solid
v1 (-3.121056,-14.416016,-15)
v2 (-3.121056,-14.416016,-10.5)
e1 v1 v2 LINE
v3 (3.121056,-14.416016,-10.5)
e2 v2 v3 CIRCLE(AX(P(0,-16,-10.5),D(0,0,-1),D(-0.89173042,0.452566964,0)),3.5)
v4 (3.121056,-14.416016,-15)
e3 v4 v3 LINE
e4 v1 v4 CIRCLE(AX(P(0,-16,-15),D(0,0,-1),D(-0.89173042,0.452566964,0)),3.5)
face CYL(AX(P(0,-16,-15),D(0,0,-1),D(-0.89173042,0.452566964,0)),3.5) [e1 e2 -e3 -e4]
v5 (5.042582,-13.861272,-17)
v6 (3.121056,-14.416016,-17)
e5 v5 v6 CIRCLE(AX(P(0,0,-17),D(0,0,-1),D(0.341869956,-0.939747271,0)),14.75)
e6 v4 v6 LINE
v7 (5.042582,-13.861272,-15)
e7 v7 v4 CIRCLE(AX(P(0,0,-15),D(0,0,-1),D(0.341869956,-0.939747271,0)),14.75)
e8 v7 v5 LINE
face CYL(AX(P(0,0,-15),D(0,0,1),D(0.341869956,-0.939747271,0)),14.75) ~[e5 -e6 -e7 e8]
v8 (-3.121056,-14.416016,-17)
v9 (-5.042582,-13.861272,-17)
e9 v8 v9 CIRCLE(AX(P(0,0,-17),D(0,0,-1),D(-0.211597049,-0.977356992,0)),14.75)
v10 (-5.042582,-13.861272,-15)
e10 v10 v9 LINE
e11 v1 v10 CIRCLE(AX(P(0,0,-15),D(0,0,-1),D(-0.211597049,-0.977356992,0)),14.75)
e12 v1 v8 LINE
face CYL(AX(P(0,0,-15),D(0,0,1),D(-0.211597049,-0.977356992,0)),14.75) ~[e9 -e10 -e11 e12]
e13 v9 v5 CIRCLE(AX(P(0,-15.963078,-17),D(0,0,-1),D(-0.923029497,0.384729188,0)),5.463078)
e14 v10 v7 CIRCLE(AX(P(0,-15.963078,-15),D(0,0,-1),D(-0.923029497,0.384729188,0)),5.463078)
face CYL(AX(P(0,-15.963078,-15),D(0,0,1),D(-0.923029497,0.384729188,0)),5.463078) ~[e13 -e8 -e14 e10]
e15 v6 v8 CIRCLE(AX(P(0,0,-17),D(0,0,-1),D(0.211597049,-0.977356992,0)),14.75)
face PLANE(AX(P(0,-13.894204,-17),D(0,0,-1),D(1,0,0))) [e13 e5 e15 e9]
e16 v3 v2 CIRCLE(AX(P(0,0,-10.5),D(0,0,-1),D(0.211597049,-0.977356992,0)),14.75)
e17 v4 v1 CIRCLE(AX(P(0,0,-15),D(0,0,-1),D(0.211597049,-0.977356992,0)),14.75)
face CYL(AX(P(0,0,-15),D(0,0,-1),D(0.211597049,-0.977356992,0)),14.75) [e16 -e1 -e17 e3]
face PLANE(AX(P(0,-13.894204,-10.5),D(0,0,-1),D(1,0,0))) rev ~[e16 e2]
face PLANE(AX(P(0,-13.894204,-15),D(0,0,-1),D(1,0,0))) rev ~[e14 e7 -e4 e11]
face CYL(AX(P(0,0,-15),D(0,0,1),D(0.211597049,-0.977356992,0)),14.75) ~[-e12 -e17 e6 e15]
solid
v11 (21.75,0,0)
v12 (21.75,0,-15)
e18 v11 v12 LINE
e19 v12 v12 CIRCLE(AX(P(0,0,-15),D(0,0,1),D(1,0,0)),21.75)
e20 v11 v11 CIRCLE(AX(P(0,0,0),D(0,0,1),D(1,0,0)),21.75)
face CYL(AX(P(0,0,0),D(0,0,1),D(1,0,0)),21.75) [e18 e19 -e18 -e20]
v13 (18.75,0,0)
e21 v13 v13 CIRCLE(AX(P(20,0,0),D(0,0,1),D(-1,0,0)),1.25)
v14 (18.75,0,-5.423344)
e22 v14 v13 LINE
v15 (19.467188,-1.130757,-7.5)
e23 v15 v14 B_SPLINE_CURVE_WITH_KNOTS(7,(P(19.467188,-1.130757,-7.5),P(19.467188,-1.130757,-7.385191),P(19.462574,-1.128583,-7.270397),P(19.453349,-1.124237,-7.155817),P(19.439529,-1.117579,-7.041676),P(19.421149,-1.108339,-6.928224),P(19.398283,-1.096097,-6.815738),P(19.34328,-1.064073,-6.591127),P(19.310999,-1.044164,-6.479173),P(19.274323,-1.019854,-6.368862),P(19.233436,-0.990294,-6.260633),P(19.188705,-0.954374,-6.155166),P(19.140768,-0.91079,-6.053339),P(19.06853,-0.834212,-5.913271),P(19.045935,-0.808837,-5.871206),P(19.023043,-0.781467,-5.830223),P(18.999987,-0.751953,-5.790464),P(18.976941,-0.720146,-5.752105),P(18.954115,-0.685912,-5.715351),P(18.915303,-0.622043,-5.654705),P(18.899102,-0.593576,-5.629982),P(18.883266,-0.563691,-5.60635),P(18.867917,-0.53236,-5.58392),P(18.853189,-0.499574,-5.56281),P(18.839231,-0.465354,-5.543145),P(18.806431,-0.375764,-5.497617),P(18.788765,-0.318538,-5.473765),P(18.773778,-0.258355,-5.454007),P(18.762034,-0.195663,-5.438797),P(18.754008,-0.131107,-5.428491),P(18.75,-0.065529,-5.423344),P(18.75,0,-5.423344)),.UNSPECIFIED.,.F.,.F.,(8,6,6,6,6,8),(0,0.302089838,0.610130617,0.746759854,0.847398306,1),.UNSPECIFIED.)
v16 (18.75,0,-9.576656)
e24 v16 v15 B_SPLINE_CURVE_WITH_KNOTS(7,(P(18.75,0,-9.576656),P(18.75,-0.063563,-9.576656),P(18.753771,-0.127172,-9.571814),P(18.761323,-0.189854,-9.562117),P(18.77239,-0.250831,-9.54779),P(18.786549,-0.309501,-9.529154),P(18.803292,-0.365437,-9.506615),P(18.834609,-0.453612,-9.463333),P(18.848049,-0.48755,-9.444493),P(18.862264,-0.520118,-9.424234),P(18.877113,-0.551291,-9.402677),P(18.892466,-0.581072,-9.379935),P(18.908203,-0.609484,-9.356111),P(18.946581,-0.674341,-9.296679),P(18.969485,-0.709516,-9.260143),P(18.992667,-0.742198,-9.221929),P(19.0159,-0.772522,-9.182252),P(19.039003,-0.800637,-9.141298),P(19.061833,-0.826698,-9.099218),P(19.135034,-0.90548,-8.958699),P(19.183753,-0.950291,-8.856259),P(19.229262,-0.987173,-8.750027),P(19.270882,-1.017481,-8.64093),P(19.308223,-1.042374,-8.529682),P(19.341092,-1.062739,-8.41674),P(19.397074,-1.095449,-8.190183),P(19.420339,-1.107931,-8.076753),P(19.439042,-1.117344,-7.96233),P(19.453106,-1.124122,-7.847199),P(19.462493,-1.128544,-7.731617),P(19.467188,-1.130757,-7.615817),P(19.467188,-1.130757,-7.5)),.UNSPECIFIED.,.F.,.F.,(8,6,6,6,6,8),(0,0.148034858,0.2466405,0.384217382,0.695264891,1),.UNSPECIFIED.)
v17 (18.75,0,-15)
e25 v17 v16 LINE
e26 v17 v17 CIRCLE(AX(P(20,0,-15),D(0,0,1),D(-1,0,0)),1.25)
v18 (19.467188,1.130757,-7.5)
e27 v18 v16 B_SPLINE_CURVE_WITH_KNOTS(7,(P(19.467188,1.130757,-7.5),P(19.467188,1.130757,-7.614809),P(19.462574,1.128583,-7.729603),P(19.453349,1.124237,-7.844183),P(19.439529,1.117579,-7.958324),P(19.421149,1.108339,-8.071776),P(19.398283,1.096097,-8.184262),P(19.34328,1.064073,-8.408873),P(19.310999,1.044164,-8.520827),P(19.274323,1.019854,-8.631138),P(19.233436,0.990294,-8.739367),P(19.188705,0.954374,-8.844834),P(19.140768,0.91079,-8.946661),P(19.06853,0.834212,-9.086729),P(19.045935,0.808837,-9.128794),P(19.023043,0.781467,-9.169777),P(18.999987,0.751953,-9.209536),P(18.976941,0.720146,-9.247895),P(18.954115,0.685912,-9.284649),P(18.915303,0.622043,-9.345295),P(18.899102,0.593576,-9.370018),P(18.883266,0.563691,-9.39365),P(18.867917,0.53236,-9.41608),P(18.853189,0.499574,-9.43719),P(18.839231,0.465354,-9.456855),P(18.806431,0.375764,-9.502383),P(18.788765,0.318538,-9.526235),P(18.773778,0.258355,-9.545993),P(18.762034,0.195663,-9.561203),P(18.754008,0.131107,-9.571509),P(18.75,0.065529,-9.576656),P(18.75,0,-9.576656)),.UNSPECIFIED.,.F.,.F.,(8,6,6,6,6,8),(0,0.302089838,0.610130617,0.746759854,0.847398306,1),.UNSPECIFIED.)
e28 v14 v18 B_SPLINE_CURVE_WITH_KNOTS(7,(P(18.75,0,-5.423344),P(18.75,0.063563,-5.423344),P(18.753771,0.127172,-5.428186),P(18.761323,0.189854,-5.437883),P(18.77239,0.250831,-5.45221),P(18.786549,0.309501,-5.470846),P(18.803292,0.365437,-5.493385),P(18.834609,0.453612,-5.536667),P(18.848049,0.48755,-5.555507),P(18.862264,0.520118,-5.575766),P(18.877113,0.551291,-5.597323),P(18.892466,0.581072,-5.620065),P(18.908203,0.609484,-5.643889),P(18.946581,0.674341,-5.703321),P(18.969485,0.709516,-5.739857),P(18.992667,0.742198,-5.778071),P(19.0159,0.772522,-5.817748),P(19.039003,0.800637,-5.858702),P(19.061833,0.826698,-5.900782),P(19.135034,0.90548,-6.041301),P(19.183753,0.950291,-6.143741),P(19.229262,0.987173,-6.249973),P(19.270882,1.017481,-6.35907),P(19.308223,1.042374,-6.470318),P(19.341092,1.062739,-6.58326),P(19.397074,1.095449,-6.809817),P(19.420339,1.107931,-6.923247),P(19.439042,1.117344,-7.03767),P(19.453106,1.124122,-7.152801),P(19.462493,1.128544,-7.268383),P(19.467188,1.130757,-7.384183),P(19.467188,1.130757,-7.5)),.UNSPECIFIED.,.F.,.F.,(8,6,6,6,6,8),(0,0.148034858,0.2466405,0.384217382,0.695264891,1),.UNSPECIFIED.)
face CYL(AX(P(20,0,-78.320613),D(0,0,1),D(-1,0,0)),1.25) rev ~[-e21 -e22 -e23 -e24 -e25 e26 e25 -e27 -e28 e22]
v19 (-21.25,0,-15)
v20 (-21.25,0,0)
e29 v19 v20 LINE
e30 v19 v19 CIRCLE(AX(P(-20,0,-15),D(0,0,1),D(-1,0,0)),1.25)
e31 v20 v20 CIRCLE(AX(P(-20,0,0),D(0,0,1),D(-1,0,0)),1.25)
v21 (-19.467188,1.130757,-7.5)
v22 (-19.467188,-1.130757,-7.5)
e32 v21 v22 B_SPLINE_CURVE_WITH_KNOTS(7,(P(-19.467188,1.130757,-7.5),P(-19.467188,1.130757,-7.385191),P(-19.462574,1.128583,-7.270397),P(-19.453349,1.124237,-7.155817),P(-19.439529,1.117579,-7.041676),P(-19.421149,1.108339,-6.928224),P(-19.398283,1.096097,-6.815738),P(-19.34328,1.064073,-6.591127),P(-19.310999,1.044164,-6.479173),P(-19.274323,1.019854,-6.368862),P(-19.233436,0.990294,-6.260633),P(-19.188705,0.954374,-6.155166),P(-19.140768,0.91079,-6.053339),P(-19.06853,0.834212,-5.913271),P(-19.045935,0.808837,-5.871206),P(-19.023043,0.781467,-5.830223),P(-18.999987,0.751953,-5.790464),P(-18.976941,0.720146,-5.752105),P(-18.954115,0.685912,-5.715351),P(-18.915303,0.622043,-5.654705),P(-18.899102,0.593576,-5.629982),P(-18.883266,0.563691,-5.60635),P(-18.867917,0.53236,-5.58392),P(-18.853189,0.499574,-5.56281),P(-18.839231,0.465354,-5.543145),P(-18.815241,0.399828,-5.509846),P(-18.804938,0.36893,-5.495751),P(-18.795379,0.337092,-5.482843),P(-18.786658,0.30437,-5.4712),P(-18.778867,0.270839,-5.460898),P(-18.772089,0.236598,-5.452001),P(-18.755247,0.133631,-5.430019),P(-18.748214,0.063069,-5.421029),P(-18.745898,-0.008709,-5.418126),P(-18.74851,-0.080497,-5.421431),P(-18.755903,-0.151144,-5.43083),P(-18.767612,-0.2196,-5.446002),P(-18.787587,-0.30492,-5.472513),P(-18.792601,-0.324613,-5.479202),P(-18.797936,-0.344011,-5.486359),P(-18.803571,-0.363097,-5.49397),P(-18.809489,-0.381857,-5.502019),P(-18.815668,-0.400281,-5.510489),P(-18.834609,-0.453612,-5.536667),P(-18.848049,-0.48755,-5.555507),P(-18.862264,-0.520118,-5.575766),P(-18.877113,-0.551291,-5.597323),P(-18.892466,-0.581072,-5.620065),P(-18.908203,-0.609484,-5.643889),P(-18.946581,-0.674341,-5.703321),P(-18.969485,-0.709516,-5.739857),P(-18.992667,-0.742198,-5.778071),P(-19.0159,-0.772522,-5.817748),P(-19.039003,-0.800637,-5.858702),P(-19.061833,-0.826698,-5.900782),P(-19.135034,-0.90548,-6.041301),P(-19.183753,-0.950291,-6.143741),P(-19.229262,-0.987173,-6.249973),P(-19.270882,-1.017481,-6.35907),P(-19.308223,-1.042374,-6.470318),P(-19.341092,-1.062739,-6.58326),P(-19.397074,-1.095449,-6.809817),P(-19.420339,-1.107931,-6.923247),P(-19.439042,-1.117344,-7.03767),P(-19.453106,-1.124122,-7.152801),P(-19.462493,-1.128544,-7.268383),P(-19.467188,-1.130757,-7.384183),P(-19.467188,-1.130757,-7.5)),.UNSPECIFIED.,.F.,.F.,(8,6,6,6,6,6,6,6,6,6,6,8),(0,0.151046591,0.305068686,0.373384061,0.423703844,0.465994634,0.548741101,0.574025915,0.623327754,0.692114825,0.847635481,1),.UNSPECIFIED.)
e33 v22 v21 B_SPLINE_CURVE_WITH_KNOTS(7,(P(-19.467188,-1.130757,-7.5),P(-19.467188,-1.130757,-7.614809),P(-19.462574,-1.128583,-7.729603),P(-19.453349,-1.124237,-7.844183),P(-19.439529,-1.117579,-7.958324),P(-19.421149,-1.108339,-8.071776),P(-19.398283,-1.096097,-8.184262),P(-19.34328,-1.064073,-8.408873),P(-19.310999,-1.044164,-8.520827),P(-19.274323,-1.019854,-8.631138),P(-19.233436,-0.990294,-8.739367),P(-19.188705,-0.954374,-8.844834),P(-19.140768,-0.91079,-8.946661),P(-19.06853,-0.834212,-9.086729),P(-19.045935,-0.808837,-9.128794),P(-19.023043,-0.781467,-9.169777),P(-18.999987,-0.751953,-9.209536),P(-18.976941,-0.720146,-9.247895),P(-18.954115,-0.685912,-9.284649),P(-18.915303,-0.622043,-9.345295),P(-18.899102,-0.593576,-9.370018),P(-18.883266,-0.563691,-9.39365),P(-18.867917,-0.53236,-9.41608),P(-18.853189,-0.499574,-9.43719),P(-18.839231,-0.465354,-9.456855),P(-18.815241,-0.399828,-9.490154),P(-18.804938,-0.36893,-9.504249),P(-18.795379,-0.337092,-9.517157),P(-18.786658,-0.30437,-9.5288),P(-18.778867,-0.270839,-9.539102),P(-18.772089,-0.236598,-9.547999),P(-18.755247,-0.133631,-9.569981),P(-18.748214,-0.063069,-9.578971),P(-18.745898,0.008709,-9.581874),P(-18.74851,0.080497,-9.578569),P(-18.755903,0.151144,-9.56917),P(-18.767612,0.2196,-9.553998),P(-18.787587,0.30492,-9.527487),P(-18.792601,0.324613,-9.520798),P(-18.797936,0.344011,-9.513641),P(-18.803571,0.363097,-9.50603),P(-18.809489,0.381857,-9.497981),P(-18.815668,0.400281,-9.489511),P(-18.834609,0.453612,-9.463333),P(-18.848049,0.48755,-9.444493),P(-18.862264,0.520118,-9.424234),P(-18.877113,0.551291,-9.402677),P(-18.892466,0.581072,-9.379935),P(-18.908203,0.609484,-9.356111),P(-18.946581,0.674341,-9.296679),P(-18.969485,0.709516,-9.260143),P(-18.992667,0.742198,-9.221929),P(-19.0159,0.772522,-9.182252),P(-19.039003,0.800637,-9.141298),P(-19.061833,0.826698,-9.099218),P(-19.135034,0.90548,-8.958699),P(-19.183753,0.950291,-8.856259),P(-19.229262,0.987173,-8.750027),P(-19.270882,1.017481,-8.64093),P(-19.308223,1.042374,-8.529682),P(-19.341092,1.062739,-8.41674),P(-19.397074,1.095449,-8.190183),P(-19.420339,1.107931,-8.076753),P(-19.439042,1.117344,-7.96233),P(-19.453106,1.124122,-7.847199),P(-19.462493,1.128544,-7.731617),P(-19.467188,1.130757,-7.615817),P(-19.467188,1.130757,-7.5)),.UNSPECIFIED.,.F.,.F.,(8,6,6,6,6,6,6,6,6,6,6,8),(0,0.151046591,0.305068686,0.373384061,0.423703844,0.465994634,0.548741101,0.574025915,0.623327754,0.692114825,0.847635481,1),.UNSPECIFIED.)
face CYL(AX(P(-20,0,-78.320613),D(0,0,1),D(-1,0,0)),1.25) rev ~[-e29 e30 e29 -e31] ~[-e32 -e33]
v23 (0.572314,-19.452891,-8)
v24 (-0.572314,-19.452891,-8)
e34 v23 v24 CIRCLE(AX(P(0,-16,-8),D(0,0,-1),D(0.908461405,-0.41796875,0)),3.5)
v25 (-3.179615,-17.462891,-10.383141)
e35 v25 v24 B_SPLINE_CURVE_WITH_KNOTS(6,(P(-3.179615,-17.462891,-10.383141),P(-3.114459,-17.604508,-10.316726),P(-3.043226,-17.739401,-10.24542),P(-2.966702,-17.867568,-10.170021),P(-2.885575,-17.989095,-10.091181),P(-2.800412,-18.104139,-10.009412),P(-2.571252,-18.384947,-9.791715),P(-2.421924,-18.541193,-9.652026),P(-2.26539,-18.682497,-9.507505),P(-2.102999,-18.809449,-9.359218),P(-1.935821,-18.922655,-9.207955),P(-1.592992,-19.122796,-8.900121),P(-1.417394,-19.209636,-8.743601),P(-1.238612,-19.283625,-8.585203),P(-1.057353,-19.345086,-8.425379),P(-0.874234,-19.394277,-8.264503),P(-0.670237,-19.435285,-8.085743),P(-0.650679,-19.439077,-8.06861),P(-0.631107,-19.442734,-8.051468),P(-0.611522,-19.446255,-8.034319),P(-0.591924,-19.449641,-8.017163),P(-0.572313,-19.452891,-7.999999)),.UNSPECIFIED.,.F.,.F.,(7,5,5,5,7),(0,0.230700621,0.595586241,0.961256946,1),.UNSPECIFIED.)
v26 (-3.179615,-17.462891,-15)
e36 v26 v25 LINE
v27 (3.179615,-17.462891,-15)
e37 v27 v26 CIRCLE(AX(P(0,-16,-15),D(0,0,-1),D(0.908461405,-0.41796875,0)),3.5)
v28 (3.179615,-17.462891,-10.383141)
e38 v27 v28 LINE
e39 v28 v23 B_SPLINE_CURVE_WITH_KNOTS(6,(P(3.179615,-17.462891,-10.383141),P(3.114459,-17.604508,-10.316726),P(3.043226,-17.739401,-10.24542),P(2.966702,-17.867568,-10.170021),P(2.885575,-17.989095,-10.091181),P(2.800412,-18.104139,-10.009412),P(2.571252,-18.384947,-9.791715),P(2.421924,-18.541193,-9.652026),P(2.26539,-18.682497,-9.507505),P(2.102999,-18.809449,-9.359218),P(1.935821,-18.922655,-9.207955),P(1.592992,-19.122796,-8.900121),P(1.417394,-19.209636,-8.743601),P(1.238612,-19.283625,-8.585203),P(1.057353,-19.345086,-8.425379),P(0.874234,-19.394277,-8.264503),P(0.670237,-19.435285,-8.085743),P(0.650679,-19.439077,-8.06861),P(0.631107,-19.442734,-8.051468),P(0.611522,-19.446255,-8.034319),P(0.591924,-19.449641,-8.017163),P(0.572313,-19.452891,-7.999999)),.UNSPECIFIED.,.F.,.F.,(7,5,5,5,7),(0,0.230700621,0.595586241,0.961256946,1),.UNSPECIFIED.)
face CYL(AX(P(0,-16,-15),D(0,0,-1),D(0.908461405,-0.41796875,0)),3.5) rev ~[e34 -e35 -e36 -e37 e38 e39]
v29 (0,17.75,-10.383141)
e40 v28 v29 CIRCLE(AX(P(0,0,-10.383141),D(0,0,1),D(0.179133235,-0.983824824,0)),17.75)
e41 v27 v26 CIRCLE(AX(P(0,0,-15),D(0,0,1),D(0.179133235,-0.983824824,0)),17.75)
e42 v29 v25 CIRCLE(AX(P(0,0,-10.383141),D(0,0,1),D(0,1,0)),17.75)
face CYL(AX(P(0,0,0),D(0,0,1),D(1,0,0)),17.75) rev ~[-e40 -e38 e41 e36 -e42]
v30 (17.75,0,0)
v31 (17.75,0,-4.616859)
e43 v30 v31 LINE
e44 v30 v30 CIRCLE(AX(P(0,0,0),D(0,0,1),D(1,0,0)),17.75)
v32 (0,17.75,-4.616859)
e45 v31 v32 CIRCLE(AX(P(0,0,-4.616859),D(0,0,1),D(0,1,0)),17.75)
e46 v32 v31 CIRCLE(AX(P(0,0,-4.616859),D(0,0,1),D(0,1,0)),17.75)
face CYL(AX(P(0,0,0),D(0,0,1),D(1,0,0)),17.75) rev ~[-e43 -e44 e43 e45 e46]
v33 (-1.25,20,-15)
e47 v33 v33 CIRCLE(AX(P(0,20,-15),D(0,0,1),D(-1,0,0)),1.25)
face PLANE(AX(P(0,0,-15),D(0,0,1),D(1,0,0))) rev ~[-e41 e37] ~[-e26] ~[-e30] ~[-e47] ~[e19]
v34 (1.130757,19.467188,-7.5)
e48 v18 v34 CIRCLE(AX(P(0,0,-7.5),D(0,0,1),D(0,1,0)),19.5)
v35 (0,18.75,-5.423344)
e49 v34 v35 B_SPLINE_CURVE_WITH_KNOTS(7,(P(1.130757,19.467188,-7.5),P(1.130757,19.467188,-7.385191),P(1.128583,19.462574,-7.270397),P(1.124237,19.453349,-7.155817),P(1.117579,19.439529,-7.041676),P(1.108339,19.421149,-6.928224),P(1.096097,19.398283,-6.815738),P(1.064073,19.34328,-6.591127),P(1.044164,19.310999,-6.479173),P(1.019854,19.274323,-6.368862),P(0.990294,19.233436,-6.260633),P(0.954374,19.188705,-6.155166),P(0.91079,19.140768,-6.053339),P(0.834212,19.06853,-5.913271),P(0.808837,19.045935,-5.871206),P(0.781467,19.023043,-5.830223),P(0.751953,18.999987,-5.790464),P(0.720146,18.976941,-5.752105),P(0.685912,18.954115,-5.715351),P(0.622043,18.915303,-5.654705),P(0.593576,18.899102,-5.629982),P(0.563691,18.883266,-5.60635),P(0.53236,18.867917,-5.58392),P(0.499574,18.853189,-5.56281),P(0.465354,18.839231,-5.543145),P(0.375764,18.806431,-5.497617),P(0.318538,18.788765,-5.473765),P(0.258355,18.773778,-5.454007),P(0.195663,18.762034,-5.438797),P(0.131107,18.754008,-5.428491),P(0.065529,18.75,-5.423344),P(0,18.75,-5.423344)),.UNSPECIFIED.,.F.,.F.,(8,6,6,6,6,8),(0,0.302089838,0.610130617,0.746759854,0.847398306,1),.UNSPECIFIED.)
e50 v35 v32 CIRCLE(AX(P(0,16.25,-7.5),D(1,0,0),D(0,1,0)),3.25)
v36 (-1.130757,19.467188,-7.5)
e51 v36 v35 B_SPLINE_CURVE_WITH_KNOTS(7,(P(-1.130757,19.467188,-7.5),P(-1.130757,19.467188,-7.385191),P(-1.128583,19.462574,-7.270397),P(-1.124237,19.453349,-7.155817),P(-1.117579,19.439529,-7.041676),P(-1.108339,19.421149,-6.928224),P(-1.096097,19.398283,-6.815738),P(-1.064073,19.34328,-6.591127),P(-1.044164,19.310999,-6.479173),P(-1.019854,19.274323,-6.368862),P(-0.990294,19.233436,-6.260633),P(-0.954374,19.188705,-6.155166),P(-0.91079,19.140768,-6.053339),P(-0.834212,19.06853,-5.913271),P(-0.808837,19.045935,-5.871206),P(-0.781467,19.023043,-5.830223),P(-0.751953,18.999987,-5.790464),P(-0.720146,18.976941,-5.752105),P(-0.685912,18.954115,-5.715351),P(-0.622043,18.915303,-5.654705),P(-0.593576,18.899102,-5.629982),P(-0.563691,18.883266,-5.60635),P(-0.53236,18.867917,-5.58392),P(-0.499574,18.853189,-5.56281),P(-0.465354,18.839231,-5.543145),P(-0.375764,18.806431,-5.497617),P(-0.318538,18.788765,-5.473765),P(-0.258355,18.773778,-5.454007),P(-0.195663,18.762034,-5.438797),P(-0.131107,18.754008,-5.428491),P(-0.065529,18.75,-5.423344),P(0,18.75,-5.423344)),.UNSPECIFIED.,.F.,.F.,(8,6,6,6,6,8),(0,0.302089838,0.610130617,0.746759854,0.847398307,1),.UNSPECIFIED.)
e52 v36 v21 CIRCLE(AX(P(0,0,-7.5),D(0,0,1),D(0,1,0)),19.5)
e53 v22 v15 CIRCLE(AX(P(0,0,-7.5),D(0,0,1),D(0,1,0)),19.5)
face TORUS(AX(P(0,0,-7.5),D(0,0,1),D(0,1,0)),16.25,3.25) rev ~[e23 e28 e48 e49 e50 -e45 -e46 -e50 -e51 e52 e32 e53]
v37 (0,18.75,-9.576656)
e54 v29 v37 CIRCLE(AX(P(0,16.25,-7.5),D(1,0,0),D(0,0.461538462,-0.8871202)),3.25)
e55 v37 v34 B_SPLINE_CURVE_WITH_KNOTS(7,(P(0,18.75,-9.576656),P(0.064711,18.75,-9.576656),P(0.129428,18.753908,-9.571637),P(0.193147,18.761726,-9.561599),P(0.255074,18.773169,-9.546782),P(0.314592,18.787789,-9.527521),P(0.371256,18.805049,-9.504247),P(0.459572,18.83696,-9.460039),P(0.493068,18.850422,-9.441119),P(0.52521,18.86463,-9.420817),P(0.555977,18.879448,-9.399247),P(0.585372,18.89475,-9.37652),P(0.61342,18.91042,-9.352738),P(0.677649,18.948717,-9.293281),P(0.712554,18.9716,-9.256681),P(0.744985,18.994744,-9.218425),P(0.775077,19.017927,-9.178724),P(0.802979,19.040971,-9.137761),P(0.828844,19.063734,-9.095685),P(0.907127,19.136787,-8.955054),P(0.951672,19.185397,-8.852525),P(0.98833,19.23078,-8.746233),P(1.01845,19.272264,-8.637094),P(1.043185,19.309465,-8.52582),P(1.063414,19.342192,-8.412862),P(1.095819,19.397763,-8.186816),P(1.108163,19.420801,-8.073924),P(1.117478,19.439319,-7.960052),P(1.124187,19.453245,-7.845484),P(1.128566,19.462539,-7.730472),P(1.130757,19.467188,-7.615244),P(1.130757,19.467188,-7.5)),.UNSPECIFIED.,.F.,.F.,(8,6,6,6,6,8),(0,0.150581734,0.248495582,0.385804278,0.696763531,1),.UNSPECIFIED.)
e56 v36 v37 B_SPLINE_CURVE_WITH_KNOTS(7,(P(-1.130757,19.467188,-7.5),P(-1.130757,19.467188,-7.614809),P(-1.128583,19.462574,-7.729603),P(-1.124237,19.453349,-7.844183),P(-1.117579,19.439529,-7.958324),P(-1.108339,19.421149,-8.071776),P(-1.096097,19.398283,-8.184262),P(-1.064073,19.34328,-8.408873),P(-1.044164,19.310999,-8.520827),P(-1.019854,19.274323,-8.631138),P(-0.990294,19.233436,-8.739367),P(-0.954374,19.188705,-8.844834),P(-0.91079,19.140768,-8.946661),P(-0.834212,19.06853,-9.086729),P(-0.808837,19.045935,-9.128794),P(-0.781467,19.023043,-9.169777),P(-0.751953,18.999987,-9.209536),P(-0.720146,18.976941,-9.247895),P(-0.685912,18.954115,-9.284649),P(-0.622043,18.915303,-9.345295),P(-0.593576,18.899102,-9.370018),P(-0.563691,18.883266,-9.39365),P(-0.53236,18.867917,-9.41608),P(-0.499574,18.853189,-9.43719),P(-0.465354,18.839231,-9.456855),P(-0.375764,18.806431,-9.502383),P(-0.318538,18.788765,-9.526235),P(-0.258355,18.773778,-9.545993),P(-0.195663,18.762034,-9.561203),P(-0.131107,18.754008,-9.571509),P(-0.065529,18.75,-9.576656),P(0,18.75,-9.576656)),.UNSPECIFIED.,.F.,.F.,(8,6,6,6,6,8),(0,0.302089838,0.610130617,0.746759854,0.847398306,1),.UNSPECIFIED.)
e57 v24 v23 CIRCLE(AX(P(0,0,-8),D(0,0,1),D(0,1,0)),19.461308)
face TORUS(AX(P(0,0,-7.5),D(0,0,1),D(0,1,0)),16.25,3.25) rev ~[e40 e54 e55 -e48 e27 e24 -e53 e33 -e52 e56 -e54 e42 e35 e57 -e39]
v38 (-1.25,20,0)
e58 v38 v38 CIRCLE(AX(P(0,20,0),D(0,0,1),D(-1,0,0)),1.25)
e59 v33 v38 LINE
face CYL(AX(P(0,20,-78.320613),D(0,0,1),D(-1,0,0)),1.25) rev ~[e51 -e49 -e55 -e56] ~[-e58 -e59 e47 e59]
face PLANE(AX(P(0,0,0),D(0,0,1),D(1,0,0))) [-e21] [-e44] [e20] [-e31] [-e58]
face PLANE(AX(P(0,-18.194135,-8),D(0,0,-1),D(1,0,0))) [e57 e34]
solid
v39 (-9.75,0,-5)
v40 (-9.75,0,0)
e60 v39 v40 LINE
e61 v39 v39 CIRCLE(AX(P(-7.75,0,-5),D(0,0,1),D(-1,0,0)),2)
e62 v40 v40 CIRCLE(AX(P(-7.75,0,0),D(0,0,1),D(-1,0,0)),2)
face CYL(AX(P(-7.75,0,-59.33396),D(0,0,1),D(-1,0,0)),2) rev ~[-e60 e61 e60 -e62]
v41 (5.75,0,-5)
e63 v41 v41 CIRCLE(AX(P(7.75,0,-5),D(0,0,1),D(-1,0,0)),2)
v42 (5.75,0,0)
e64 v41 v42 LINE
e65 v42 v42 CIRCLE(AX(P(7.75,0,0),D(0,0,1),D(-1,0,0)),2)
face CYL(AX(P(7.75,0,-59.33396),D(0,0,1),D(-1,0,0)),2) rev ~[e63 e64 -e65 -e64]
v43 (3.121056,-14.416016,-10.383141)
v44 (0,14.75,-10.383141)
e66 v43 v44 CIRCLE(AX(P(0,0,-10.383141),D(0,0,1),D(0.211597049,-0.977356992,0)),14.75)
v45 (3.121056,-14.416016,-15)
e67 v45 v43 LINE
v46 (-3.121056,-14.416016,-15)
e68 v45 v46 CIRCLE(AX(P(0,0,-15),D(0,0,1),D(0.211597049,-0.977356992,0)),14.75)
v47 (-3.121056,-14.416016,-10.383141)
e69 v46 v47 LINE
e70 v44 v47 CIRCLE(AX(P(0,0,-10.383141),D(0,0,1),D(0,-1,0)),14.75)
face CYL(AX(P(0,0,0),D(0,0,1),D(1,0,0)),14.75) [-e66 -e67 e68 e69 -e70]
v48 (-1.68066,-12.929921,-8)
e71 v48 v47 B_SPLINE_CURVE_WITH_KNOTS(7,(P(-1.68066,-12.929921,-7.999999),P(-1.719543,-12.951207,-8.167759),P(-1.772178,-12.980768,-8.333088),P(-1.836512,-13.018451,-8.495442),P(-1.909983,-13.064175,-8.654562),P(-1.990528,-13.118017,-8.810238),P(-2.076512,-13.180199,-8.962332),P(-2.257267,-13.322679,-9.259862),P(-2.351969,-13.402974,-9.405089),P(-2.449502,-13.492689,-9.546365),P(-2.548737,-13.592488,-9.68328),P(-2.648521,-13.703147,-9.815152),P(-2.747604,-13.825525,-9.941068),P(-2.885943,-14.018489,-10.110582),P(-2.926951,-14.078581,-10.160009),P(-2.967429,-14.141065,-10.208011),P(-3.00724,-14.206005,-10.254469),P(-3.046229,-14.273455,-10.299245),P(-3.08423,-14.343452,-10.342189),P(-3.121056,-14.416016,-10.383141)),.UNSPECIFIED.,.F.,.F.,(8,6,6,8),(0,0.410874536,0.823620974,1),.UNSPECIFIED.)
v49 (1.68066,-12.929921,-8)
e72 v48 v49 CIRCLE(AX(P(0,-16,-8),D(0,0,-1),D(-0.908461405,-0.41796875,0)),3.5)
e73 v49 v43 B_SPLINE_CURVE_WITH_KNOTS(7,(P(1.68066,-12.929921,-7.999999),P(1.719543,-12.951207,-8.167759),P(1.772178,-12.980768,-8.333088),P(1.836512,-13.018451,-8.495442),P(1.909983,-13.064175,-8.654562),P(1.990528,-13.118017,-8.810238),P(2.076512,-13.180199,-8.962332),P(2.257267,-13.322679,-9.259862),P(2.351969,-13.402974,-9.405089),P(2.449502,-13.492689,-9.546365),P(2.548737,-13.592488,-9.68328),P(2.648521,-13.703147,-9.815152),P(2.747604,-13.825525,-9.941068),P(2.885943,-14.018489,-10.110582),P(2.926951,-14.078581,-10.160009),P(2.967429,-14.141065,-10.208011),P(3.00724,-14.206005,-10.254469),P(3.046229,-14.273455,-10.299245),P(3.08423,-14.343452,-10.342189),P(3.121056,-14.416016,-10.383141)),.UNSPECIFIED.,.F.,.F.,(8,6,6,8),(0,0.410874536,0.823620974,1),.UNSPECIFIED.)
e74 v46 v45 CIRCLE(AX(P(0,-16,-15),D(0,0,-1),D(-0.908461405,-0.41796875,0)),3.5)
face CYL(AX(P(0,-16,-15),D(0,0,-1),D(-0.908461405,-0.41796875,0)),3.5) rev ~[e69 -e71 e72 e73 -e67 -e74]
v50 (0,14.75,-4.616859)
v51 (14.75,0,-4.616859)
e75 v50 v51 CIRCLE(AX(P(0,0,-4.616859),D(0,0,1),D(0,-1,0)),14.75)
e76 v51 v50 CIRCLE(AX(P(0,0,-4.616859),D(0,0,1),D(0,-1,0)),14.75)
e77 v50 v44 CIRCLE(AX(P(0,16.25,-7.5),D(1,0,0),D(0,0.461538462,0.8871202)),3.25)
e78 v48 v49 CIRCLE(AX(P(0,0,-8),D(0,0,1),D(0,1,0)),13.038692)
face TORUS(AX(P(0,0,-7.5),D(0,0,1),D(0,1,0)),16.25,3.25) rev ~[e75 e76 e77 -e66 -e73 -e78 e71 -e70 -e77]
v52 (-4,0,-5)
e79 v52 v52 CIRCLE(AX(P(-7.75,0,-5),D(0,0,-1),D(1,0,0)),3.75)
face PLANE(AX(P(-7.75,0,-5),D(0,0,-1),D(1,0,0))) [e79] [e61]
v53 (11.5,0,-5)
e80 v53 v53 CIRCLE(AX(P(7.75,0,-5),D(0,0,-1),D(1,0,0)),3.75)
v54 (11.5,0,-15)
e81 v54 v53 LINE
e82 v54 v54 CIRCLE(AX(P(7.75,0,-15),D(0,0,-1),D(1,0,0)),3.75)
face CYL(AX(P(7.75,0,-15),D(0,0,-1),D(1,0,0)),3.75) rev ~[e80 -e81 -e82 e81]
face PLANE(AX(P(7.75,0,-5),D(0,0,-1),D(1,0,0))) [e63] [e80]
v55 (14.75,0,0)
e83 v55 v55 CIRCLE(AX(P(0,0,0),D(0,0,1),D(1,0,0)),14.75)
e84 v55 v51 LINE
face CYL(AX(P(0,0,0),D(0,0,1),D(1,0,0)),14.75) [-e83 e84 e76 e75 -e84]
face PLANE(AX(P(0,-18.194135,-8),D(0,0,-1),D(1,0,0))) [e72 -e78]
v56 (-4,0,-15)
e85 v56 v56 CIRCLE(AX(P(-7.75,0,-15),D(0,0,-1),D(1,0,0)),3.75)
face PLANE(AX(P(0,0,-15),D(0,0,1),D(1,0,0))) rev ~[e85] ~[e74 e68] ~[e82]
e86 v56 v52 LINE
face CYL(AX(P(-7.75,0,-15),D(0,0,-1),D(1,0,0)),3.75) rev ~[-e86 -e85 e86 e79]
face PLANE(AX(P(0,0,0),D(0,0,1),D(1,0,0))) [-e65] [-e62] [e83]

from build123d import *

# Parameters (mm, degrees)
F0_R      = 21.75
F0_R_2    = 17.75
F1_DEPTH  = 15
F0_R_3    = 14.75
F0_R_4    = 4
F9_DEPTH  = 7
F11_D     = 4
F10_R     = 3.75
F12_DEPTH = 10
F14_D     = 2.5
F16_DEPTH = 2
F17_DEPTH = 4.5


with BuildPart() as f1:
    # F0 (on Top) → F1 (new body)
    with BuildSketch(Plane.XY):
        Circle(F0_R)
        Circle(F0_R_2, mode=Mode.SUBTRACT)
    extrude(amount=-F1_DEPTH)


with BuildPart() as f1b:
    # F0 (on Top) → F1, piece 2 (new body)
    with BuildSketch(Plane.XY):
        Circle(F0_R_3)
        Circle(F0_R_4, mode=Mode.SUBTRACT)
        Circle(F0_R_4)
    extrude(amount=-F1_DEPTH)


with BuildPart() as f6_tool:
    # F4 (on Right) → F6 (revolve)
    with BuildSketch(Plane.YZ):
        with BuildLine():
            Line((17.75, -10.3831406487), (17.75, -4.6168593513))
            ThreePointArc((17.75, -4.6168593513), (13, -7.5), (17.75, -10.3831406487))
        make_face()
        with BuildLine():
            ThreePointArc((17.75, -10.3831406487), (19.0282638464, -9.1863421954), (19.5, -7.5))
            ThreePointArc((19.5, -7.5), (19.0282638464, -5.8136578046), (17.75, -4.6168593513))
            Line((17.75, -4.6168593513), (17.75, -10.3831406487))
        make_face()
    revolve(axis=Axis((0, 0, 0), (0, 0, 1)))


with BuildPart() as f1_1:
    add(f1.part)

    # F6: cut by f6_tool
    add(f6_tool.part, mode=Mode.SUBTRACT)


with BuildPart() as f1b_1:
    add(f1b.part)

    # F6: cut by f6_tool
    add(f6_tool.part, mode=Mode.SUBTRACT)


with BuildPart() as f9_tool:
    # F8 (on face) → F9 (new body)
    with BuildSketch(Plane(origin=(0, 0, -15), x_dir=(1, 0, 0), z_dir=(0, 0, -1))):
        with BuildLine():
            ThreePointArc((-3.1796149168, 17.462890625), (0, 17.75), (3.1796149168, 17.462890625))
            ThreePointArc((3.1796149168, 17.462890625), (0, 19.5), (-3.1796149168, 17.462890625))
        make_face()
        with BuildLine():
            ThreePointArc((-3.1796149168, 17.462890625), (-0.7487816074, 12.5810343517), (3.5, 16))
            ThreePointArc((3.5, 16), (3.4189656483, 16.7487816074), (3.1796149168, 17.462890625))
            ThreePointArc((3.1796149168, 17.462890625), (0, 17.75), (-3.1796149168, 17.462890625))
        make_face()
    extrude(amount=-F9_DEPTH)


with BuildPart() as f1_2:
    add(f1_1.part)

    # F9: cut by f9_tool
    add(f9_tool.part, mode=Mode.SUBTRACT)

    # F14 (through all)
    with Locations(Plane(origin=(0, 0, -15), x_dir=(1, 0, 0), z_dir=(0, 0, -1))):
        with Locations((-20, 0), (0, -20), (20, 0)):
            Hole(F14_D / 2)


with BuildPart() as f1b_2:
    add(f1b_1.part)

    # F9: cut by f9_tool
    add(f9_tool.part, mode=Mode.SUBTRACT)

    # F11 (through all)
    with Locations(Plane(origin=(0, 0, -15), x_dir=(1, 0, 0), z_dir=(0, 0, -1))):
        with Locations((-7.75, 0), (7.75, 0)):
            Hole(F11_D / 2)

    # F10 (on face) → F12 (cut)
    with BuildSketch(Plane(origin=(0, 0, -15), x_dir=(1, 0, 0), z_dir=(0, 0, -1))):
        with Locations((-7.75, 0)):
            Circle(F10_R)
        with Locations((7.75, 0)):
            Circle(F10_R)
    extrude(amount=-F12_DEPTH, mode=Mode.SUBTRACT)


with BuildPart() as f16:
    # F15 (on face) → F16 (new body)
    with BuildSketch(Plane(origin=(0, 0, -15), x_dir=(1, 0, 0), z_dir=(0, 0, -1))):
        with BuildLine():
            ThreePointArc((-3.1210564717, 14.416015625), (0, 12.5), (3.1210564717, 14.416015625))
            ThreePointArc((3.1210564717, 14.416015625), (0, 14.75), (-3.1210564717, 14.416015625))
        make_face()
        with BuildLine():
            ThreePointArc((-5.0425818511, 13.8612722459), (0, 10.5), (5.0425818511, 13.8612722459))
            ThreePointArc((5.0425818511, 13.8612722459), (4.0912324207, 14.1712496725), (3.1210564717, 14.416015625))
            ThreePointArc((3.1210564717, 14.416015625), (0, 12.5), (-3.1210564717, 14.416015625))
            ThreePointArc((-3.1210564717, 14.416015625), (-4.0912324207, 14.1712496725), (-5.0425818511, 13.8612722459))
        make_face()
    extrude(amount=F16_DEPTH)

    # F15 (on face) → F17 (join)
    with BuildSketch(Plane(origin=(0, 0, -15), x_dir=(1, 0, 0), z_dir=(0, 0, -1))):
        with BuildLine():
            ThreePointArc((-3.1210564717, 14.416015625), (0, 12.5), (3.1210564717, 14.416015625))
            ThreePointArc((3.1210564717, 14.416015625), (0, 14.75), (-3.1210564717, 14.416015625))
        make_face()
    extrude(amount=-F17_DEPTH)


solid = Compound([f1_2.part, f1b_2.part, f16.part])
